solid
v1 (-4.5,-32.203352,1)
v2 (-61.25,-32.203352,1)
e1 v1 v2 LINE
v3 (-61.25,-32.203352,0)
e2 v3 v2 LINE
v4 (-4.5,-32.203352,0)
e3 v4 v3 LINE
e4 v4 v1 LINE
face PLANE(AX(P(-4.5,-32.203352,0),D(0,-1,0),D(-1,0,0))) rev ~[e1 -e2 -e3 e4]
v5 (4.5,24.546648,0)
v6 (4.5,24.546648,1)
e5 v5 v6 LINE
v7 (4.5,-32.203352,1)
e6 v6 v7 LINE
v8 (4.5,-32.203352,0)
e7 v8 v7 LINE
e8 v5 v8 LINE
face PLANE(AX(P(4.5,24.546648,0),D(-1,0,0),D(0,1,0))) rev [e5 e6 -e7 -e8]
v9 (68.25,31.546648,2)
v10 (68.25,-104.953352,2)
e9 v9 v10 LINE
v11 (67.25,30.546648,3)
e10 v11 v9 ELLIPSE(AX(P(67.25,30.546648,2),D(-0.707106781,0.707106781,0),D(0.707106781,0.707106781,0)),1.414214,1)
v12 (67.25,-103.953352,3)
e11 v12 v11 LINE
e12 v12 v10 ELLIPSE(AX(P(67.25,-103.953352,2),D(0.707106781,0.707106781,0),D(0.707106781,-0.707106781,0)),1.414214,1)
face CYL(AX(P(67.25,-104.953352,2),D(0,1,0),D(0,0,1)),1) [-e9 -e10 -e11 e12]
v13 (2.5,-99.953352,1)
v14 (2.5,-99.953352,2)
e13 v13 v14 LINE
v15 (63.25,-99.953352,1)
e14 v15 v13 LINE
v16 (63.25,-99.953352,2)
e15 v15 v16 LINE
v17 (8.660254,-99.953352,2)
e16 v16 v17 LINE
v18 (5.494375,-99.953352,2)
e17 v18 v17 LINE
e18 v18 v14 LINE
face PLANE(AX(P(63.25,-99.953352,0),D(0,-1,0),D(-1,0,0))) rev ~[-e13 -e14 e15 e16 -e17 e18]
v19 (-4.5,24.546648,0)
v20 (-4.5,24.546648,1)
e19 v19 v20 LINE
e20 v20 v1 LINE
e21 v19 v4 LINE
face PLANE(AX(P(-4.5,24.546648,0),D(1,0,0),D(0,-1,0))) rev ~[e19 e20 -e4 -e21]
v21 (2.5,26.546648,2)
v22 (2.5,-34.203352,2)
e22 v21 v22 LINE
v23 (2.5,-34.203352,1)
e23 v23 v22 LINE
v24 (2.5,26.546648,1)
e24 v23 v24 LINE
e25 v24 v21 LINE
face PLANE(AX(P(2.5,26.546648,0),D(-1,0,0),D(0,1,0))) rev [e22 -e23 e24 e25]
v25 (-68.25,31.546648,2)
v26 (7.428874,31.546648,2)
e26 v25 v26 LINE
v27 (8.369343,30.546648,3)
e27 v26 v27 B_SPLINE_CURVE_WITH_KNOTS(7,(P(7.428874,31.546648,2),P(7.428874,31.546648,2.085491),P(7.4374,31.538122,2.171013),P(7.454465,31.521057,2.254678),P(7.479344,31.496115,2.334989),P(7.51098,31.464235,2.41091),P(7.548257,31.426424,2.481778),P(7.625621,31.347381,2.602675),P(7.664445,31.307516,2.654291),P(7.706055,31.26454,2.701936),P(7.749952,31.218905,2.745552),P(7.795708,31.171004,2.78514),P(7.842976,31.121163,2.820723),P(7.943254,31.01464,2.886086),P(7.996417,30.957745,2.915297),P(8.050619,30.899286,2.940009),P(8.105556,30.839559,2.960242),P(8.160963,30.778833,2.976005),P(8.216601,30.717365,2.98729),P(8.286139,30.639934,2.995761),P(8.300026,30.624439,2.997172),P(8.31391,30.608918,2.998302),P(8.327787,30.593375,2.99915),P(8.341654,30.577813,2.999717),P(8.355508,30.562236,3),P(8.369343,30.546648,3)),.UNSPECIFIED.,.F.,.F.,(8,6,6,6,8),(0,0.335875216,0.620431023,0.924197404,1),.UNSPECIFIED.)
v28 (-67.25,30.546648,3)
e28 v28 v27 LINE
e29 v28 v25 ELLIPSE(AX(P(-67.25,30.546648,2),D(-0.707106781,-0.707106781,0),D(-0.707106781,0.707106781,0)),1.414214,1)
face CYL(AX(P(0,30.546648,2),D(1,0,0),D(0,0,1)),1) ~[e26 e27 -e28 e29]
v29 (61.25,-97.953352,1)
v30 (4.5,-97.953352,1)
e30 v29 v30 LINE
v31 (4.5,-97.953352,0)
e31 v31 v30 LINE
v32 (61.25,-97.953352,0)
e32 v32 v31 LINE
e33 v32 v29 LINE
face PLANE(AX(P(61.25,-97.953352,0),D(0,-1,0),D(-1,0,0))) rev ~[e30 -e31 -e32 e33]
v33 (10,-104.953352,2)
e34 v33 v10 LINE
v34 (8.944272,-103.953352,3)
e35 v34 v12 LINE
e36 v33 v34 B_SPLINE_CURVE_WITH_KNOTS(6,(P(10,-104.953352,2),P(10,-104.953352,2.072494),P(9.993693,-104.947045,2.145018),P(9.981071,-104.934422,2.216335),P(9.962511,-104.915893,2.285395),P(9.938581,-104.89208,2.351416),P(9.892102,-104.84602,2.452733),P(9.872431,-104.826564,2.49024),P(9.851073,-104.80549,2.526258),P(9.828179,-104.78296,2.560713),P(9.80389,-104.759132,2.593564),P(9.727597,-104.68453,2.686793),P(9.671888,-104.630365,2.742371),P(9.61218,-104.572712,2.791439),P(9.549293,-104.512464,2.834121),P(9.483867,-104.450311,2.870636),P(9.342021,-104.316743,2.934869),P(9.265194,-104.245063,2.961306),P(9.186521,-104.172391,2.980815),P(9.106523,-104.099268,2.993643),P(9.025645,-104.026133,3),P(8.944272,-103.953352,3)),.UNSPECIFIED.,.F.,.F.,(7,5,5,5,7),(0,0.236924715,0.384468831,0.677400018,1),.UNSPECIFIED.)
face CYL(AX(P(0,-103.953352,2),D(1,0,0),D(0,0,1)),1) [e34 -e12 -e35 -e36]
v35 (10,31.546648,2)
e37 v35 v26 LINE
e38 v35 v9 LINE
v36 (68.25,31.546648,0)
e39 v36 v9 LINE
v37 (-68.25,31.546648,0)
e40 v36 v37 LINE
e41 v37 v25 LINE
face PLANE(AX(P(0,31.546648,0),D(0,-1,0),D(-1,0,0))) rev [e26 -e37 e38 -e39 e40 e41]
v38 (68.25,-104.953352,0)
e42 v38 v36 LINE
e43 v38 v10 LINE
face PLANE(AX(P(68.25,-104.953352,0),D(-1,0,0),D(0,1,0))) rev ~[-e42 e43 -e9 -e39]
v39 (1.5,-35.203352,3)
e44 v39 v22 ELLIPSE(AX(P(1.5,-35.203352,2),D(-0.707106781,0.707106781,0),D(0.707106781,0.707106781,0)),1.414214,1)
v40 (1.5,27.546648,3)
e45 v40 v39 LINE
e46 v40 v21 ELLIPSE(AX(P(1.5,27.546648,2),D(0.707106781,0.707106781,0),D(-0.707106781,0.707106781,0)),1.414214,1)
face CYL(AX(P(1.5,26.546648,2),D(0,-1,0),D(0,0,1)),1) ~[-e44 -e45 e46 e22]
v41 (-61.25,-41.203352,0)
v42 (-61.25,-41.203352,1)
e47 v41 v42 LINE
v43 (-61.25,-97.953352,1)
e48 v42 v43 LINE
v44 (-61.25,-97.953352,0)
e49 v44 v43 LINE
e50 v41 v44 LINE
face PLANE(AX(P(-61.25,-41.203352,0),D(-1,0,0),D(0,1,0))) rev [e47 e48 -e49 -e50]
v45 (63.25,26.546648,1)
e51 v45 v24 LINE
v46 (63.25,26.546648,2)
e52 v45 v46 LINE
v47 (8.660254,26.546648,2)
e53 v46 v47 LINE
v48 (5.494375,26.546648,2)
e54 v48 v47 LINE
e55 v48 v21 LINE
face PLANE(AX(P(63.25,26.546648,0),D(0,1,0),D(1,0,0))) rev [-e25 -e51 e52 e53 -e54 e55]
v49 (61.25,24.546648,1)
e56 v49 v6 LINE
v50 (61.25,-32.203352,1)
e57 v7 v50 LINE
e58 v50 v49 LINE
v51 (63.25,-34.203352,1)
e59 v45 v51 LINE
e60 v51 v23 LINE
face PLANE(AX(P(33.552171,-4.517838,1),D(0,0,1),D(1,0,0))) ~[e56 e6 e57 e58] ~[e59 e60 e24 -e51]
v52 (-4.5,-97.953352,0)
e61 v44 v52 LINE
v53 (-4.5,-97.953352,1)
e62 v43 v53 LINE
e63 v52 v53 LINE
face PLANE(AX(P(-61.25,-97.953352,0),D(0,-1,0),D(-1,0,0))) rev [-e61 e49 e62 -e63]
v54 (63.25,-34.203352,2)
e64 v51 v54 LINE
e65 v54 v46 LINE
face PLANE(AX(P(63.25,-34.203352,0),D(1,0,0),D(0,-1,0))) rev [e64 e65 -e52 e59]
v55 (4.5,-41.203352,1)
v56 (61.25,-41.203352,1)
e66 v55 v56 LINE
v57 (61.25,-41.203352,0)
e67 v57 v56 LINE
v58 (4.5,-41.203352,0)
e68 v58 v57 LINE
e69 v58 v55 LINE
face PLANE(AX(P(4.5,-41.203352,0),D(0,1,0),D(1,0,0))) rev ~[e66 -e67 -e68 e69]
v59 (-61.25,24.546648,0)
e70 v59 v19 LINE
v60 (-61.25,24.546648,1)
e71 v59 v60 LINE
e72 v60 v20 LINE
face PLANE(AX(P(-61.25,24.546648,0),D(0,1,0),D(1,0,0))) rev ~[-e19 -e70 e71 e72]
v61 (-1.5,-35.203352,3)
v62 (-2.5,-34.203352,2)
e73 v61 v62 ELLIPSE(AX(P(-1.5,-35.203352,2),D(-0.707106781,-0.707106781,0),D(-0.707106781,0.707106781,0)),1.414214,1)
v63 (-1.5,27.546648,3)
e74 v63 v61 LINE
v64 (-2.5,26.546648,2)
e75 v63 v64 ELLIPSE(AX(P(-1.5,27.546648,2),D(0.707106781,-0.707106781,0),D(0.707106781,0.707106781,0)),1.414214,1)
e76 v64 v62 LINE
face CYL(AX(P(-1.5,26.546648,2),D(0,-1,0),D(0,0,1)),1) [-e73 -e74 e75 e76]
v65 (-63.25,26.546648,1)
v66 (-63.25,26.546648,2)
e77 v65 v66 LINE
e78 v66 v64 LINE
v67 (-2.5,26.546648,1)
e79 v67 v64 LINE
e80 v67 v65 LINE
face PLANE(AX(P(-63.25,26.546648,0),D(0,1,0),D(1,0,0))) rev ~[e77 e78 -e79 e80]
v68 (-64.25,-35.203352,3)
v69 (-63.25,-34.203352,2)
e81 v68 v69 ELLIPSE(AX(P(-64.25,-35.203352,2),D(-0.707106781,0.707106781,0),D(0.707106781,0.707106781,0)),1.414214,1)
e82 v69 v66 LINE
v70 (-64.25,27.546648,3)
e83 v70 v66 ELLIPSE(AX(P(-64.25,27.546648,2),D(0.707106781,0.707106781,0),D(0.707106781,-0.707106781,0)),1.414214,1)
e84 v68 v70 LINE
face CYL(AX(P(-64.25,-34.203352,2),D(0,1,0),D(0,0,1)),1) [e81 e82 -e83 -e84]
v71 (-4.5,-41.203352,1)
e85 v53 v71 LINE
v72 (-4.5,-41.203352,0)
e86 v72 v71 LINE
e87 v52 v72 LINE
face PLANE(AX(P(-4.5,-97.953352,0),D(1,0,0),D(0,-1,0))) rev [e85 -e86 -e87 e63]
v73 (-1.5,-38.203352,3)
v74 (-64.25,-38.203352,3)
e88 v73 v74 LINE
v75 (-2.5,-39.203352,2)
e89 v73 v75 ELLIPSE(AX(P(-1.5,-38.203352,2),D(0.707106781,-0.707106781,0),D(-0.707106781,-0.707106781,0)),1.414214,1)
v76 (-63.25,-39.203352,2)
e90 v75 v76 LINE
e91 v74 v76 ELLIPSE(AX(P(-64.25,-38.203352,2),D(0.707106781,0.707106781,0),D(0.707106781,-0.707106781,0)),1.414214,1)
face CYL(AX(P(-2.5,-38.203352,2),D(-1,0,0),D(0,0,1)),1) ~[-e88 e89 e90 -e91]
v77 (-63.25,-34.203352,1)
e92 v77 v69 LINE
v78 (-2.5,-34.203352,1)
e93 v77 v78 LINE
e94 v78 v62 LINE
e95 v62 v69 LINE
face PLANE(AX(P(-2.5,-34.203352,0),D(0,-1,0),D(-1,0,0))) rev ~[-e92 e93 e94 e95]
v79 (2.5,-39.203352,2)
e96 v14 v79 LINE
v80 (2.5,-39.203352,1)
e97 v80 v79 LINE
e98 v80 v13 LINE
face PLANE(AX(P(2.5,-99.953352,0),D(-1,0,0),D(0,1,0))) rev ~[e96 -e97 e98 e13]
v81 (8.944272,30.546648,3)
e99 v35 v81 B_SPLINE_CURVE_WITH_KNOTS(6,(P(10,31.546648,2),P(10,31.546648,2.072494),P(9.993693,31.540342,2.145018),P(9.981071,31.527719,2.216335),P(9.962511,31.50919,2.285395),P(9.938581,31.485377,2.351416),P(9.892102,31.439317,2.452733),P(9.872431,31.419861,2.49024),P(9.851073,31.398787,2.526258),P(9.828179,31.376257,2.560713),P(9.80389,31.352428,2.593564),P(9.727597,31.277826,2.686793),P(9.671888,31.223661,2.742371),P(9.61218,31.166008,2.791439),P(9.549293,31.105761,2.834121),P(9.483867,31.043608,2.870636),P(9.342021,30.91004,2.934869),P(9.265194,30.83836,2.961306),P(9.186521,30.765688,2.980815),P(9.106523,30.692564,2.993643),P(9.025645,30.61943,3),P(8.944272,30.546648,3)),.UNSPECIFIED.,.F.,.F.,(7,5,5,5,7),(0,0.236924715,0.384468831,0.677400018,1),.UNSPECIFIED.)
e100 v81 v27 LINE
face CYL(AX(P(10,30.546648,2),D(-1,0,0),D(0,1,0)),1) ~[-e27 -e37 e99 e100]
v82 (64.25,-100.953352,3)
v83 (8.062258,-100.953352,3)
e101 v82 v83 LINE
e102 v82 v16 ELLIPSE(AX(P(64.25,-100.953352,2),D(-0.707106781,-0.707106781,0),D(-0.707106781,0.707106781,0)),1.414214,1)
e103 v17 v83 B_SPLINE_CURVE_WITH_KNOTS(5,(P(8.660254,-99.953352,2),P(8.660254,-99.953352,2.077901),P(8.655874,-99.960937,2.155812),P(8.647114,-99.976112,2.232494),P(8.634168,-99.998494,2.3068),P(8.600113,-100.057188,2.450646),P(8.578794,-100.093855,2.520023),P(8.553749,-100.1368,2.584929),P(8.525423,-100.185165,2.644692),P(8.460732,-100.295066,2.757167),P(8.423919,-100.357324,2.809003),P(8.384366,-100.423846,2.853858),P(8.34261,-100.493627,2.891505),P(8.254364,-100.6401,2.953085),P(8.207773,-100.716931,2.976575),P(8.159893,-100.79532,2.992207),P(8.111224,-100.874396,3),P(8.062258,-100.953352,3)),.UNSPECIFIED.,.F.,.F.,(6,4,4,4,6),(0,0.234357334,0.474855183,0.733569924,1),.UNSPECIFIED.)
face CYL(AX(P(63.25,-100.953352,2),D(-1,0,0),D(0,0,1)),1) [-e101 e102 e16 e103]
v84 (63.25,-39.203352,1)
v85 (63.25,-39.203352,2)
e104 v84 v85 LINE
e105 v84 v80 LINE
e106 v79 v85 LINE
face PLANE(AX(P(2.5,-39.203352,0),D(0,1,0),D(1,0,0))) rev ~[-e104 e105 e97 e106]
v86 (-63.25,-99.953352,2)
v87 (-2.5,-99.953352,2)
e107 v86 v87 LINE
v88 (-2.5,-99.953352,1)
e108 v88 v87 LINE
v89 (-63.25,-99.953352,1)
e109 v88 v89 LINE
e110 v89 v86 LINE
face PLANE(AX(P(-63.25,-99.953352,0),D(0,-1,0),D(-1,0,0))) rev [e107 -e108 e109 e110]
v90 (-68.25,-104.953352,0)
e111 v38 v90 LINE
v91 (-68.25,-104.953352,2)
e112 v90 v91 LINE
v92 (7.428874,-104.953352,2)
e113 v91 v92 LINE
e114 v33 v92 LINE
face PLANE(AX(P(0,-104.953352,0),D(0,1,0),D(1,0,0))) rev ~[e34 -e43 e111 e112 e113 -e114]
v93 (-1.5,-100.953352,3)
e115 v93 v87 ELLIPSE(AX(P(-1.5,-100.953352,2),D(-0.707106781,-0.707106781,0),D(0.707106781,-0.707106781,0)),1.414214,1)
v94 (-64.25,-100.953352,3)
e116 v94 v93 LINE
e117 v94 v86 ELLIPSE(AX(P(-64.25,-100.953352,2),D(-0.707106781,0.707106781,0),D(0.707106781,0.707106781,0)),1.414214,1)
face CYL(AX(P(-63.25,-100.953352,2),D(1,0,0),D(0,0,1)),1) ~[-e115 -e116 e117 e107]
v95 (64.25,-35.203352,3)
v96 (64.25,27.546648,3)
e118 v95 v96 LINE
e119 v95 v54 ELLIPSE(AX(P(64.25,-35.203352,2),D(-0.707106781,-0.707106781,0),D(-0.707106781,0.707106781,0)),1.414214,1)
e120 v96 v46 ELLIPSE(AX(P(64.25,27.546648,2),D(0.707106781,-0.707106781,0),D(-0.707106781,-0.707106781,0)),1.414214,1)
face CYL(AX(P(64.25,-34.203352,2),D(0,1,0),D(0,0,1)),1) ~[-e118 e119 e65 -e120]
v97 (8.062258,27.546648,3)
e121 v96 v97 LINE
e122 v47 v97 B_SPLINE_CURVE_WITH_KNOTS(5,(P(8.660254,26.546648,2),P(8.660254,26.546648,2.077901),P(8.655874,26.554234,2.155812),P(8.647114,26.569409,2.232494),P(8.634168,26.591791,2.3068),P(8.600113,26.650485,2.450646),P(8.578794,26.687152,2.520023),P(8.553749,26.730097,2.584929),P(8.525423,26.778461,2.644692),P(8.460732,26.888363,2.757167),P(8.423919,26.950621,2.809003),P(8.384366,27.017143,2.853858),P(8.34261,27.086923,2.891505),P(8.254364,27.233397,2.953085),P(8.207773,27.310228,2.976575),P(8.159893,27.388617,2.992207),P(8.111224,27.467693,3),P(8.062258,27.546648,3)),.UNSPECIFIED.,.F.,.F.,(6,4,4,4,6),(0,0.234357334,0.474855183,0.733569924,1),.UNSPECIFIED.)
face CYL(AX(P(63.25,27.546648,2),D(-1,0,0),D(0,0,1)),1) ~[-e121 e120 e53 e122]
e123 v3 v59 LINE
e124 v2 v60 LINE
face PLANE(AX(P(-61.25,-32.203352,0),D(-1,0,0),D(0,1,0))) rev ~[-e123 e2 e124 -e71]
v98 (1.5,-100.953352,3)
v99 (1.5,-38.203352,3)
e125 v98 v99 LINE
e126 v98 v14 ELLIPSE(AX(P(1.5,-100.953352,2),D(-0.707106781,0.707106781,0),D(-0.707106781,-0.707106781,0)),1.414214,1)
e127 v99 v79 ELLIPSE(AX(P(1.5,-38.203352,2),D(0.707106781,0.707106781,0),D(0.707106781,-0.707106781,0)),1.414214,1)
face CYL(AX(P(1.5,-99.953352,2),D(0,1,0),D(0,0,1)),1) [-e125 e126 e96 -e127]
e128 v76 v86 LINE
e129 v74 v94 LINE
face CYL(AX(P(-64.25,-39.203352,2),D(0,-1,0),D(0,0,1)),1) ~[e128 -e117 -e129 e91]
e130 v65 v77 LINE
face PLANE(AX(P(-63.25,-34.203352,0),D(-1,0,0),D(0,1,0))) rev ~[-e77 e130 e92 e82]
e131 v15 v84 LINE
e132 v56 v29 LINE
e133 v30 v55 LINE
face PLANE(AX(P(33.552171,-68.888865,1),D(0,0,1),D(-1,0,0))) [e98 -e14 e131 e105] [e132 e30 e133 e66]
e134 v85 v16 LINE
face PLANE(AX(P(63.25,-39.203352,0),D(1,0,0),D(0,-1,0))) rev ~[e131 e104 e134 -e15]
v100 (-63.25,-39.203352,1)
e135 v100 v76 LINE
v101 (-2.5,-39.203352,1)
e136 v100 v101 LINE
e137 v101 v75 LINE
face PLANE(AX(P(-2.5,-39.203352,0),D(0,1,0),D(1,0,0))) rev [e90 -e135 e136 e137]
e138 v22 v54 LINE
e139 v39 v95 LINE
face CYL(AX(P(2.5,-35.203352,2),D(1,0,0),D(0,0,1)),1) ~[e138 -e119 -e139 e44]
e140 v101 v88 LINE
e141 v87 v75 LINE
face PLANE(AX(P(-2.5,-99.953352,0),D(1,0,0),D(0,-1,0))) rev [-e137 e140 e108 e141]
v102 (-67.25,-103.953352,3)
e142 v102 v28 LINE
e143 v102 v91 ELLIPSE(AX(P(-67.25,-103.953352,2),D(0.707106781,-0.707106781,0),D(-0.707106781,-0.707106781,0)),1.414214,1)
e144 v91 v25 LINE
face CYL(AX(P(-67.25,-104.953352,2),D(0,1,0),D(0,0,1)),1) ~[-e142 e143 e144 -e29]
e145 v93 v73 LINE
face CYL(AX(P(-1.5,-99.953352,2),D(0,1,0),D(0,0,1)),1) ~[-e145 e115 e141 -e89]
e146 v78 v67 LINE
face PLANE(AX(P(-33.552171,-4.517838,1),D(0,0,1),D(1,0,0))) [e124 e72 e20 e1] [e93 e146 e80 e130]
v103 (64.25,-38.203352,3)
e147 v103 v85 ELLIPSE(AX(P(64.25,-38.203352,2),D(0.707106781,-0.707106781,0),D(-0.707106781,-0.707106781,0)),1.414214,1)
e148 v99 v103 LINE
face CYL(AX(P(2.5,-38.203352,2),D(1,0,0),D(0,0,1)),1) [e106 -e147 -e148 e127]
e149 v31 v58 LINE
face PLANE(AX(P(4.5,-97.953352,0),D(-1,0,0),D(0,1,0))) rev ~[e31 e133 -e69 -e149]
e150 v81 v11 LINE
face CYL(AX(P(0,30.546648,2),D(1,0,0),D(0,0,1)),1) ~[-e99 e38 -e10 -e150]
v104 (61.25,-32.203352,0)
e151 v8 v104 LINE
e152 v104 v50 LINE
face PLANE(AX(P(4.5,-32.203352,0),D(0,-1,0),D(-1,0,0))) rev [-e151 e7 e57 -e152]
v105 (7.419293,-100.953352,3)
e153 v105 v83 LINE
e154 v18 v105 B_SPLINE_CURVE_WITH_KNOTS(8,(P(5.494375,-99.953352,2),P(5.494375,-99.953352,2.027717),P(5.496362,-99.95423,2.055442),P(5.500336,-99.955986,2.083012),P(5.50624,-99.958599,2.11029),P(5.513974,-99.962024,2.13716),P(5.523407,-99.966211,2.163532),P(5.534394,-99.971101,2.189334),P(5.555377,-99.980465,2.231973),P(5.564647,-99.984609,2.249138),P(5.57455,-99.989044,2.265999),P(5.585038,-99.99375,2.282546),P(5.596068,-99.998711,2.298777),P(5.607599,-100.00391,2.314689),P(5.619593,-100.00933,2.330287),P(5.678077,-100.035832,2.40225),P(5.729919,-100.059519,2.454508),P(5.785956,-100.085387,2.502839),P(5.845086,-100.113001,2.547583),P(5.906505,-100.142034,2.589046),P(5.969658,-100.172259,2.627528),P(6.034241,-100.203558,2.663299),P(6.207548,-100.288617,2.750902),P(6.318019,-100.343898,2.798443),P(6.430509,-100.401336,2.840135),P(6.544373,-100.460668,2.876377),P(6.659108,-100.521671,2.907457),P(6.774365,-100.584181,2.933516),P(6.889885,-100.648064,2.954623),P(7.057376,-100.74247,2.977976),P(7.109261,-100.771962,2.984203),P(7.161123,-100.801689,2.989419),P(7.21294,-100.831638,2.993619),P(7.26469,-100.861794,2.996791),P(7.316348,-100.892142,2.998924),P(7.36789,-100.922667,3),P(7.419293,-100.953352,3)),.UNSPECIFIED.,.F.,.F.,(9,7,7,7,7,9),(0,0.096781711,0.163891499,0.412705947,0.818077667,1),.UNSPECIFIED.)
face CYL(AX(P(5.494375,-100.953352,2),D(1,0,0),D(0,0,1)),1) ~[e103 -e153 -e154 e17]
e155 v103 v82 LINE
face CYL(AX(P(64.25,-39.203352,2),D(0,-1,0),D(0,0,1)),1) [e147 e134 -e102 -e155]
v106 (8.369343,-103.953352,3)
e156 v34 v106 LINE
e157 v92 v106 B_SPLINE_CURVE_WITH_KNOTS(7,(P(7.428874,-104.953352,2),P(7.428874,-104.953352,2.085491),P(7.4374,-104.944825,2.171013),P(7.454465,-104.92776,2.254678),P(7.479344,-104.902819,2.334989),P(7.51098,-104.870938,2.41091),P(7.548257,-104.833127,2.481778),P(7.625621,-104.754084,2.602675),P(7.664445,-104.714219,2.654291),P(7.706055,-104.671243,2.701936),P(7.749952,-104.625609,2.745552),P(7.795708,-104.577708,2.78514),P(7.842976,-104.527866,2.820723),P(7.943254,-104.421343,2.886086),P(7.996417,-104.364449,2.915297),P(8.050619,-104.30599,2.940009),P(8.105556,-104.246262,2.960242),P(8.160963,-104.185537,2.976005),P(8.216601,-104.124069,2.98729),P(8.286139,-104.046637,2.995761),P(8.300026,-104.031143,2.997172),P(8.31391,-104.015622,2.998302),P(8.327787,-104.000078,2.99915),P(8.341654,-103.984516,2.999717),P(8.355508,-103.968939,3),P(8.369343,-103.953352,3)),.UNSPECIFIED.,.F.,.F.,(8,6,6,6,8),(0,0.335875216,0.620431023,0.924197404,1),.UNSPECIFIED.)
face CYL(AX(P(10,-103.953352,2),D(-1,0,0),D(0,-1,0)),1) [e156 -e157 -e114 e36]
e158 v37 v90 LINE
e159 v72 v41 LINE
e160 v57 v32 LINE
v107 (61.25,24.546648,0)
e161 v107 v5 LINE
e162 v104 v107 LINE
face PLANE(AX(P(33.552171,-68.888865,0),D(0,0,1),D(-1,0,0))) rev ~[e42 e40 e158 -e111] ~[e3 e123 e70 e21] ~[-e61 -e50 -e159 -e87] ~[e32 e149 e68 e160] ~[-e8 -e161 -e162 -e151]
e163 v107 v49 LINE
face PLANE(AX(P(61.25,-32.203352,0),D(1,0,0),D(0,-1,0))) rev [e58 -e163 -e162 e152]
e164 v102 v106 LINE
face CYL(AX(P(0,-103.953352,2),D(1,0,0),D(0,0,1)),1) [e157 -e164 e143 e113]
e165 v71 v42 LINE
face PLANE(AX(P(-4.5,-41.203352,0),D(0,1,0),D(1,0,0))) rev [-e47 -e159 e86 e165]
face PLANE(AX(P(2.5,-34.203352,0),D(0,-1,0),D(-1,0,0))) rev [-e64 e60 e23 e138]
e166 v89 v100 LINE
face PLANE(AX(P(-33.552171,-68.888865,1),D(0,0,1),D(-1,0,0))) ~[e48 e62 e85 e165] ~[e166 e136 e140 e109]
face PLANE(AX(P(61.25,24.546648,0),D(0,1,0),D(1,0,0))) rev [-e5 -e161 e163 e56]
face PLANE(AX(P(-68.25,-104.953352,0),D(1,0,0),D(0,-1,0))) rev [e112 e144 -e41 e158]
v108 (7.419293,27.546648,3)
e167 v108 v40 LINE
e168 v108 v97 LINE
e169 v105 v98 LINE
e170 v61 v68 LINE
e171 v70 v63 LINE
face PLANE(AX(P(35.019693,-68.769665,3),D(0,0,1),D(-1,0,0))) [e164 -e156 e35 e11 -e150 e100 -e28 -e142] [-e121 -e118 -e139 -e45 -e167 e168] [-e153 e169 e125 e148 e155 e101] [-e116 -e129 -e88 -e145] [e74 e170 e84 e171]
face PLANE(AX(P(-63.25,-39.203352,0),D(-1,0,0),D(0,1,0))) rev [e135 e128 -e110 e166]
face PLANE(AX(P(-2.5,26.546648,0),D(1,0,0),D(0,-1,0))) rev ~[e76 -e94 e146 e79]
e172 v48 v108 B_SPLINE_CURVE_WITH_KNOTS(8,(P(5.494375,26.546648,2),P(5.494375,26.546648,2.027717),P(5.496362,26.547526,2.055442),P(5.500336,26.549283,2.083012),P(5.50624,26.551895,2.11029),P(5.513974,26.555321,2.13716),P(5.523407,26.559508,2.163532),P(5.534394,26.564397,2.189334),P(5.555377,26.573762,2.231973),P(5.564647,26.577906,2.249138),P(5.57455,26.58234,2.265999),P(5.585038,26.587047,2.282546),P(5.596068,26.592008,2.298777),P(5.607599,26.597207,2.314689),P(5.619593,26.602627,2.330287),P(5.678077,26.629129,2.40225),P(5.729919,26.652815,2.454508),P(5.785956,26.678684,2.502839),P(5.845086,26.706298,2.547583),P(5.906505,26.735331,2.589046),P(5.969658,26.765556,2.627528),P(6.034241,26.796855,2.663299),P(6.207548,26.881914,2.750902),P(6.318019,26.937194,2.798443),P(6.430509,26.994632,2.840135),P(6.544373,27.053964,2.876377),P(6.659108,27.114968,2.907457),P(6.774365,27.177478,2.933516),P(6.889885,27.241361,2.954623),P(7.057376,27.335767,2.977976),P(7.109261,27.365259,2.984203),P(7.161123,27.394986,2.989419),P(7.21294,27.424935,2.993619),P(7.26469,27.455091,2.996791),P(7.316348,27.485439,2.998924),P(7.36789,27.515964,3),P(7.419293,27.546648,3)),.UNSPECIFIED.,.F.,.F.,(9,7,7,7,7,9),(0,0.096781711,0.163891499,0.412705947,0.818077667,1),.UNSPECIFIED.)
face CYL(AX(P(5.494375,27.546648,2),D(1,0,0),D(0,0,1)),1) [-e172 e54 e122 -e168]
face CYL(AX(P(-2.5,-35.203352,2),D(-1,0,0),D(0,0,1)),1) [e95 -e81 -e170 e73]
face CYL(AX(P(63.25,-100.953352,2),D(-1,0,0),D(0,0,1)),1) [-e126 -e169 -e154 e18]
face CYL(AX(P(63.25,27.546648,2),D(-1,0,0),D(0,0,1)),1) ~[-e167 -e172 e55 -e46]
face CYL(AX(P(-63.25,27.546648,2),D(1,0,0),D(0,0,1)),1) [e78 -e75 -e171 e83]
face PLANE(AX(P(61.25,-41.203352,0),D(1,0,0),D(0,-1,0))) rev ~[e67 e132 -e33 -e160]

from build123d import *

# Parameters (mm, degrees)
F1_DEPTH = 3
F2_DEPTH = 1
F3_R     = 1
F3_2_R   = 1


# Not quite as in the source:
# - a feature names something its author has since deleted; it is built from what else it names


with BuildPart() as f1:
    # F0 (on Top) → F1 (new body)
    with BuildSketch(Plane.XY):
        with BuildLine():
            Line((-63.25, -34.2033516131), (-63.25, 26.5466483869))
            Line((-63.25, 26.5466483869), (-8.6602540378, 26.5466483869))
            ThreePointArc((-8.6602540378, 26.5466483869), (-9.6592582629, 28.9584579359), (-10, 31.5466483869))
            Line((-10, 31.5466483869), (-34.125, 31.5466483869))
            Line((-34.125, 31.5466483869), (-68.25, 31.5466483869))
            Line((-68.25, 31.5466483869), (-68.25, -36.7033516131))
            Line((-68.25, -36.7033516131), (0, -36.7033516131))
            Line((0, -36.7033516131), (0, 21.5466483869))
            ThreePointArc((0, 21.5466483869), (-1.2600429248, 21.6263514243), (-2.5, 21.8641900214))
            Line((-2.5, 21.8641900214), (-2.5, -34.2033516131))
            Line((-2.5, -34.2033516131), (-63.25, -34.2033516131))
        make_face()
        with BuildLine():
            ThreePointArc((-10, 31.5466483869), (-9.6592582629, 28.9584579359), (-8.6602540378, 26.5466483869))
            Line((-8.6602540378, 26.5466483869), (-5.4943754879, 26.5466483869))
            ThreePointArc((-5.4943754879, 26.5466483869), (-6.9283902407, 28.8660569086), (-7.4288735352, 31.5466483869))
            Line((-7.4288735352, 31.5466483869), (-10, 31.5466483869))
        make_face()
        with BuildLine():
            ThreePointArc((-7.4288735352, 31.5466483869), (-6.9283902407, 28.8660569086), (-5.4943754879, 26.5466483869))
            Line((-5.4943754879, 26.5466483869), (-2.5, 26.5466483869))
            Line((-2.5, 26.5466483869), (-2.5, 24.5510667812))
            ThreePointArc((-2.5, 24.5510667812), (-1.2686352802, 24.2268993115), (0, 24.1177748517))
            Line((0, 24.1177748517), (0, 31.5466483869))
            Line((0, 31.5466483869), (-7.4288735352, 31.5466483869))
        make_face()
        with BuildLine():
            ThreePointArc((0, 24.1177748517), (-1.2686352802, 24.2268993115), (-2.5, 24.5510667812))
            Line((-2.5, 24.5510667812), (-2.5, 21.8641900214))
            ThreePointArc((-2.5, 21.8641900214), (-1.2600429248, 21.6263514243), (0, 21.5466483869))
            Line((0, 21.5466483869), (0, 24.1177748517))
        make_face()
    extrude(amount=F1_DEPTH)

    # F0 (on Top) → F2 (join)
    with BuildSketch(Plane.XY):
        with BuildLine():
            Line((-8.6602540378, 26.5466483869), (-63.25, 26.5466483869))
            Line((-63.25, 26.5466483869), (-63.25, -34.2033516131))
            Line((-63.25, -34.2033516131), (-2.5, -34.2033516131))
            Line((-2.5, -34.2033516131), (-2.5, 21.8641900214))
            ThreePointArc((-2.5, 21.8641900214), (-3.5201478643, 22.1867039953), (-4.5, 22.6163628372))
            Line((-4.5, 22.6163628372), (-4.5, -32.2033516131))
            Line((-4.5, -32.2033516131), (-61.25, -32.2033516131))
            Line((-61.25, -32.2033516131), (-61.25, 24.5466483869))
            Line((-61.25, 24.5466483869), (-7.1414284285, 24.5466483869))
            ThreePointArc((-7.1414284285, 24.5466483869), (-7.9638741949, 25.4987803487), (-8.6602540378, 26.5466483869))
        make_face()
        with BuildLine():
            ThreePointArc((-10, 31.5466483869), (-9.6592582629, 28.9584579359), (-8.6602540378, 26.5466483869))
            Line((-8.6602540378, 26.5466483869), (-5.4943754879, 26.5466483869))
            ThreePointArc((-5.4943754879, 26.5466483869), (-6.9283902407, 28.8660569086), (-7.4288735352, 31.5466483869))
            Line((-7.4288735352, 31.5466483869), (-10, 31.5466483869))
        make_face()
        with BuildLine():
            Line((-5.4943754879, 26.5466483869), (-8.6602540378, 26.5466483869))
            ThreePointArc((-8.6602540378, 26.5466483869), (-7.9638741949, 25.4987803487), (-7.1414284285, 24.5466483869))
            Line((-7.1414284285, 24.5466483869), (-4.5, 24.5466483869))
            Line((-4.5, 24.5466483869), (-4.5, 22.6163628372))
            ThreePointArc((-4.5, 22.6163628372), (-3.5201478643, 22.1867039953), (-2.5, 21.8641900214))
            Line((-2.5, 21.8641900214), (-2.5, 24.5510667812))
            ThreePointArc((-2.5, 24.5510667812), (-4.1198417866, 25.364814868), (-5.4943754879, 26.5466483869))
        make_face()
        with BuildLine():
            Line((-2.5, 26.5466483869), (-5.4943754879, 26.5466483869))
            ThreePointArc((-5.4943754879, 26.5466483869), (-4.1198417866, 25.364814868), (-2.5, 24.5510667812))
            Line((-2.5, 24.5510667812), (-2.5, 26.5466483869))
        make_face()
    extrude(amount=F2_DEPTH)

    # F3
    f3_edges = [f1.edges().sort_by_distance(p)[0] for p in [
        (-32.875, 26.546648, 3),
        (-63.25, -3.828352, 3),
        (-32.875, -34.203352, 3),
        (-2.5, -3.828352, 3),
        (-34.125, 31.546648, 3),
        (-68.25, -2.578352, 3),
    ]]
    fillet(f3_edges, radius=F3_R)



with BuildPart() as f1b:
    # F0 (on Top) → F1, piece 2 (new body)
    with BuildSketch(Plane.XY):
        with BuildLine():
            ThreePointArc((8.6602540378, 26.5466483869), (9.6592582629, 28.9584579359), (10, 31.5466483869))
            Line((10, 31.5466483869), (7.4288735352, 31.5466483869))
            ThreePointArc((7.4288735352, 31.5466483869), (6.9283902407, 28.8660569086), (5.4943754879, 26.5466483869))
            Line((5.4943754879, 26.5466483869), (8.6602540378, 26.5466483869))
        make_face()
    extrude(amount=F1_DEPTH)

    # F0 (on Top) → F2, piece 2 (join)
    with BuildSketch(Plane.XY):
        with BuildLine():
            ThreePointArc((8.6602540378, 26.5466483869), (9.6592582629, 28.9584579359), (10, 31.5466483869))
            Line((10, 31.5466483869), (7.4288735352, 31.5466483869))
            ThreePointArc((7.4288735352, 31.5466483869), (6.9283902407, 28.8660569086), (5.4943754879, 26.5466483869))
            Line((5.4943754879, 26.5466483869), (8.6602540378, 26.5466483869))
        make_face()
    extrude(amount=F2_DEPTH)

    # F3#2
    f3_2_edges = [f1b.edges().sort_by_distance(p)[0] for p in [
        (9.659258, 28.958458, 3),
        (6.92839, 28.866057, 3),
        (7.077315, 26.546648, 3),
        (8.714437, 31.546648, 3),
    ]]
    fillet(f3_2_edges, radius=F3_2_R)


with BuildPart() as f1_1:
    add(f1.part)

    add(f1b.part)  # F4 merges F1b
    # F4: F1 across plane
    add(f1.part.mirror(Plane.YZ))

    # F5: F1 across face


with BuildPart() as f1_2:
    add(f1_1.part)
    add(f1_1.part.mirror(Plane(origin=(0, -36.7033516131, 1.4986605371), x_dir=(1, 0, 0), z_dir=(0, -1, 0))))


solid = f1_2.part
